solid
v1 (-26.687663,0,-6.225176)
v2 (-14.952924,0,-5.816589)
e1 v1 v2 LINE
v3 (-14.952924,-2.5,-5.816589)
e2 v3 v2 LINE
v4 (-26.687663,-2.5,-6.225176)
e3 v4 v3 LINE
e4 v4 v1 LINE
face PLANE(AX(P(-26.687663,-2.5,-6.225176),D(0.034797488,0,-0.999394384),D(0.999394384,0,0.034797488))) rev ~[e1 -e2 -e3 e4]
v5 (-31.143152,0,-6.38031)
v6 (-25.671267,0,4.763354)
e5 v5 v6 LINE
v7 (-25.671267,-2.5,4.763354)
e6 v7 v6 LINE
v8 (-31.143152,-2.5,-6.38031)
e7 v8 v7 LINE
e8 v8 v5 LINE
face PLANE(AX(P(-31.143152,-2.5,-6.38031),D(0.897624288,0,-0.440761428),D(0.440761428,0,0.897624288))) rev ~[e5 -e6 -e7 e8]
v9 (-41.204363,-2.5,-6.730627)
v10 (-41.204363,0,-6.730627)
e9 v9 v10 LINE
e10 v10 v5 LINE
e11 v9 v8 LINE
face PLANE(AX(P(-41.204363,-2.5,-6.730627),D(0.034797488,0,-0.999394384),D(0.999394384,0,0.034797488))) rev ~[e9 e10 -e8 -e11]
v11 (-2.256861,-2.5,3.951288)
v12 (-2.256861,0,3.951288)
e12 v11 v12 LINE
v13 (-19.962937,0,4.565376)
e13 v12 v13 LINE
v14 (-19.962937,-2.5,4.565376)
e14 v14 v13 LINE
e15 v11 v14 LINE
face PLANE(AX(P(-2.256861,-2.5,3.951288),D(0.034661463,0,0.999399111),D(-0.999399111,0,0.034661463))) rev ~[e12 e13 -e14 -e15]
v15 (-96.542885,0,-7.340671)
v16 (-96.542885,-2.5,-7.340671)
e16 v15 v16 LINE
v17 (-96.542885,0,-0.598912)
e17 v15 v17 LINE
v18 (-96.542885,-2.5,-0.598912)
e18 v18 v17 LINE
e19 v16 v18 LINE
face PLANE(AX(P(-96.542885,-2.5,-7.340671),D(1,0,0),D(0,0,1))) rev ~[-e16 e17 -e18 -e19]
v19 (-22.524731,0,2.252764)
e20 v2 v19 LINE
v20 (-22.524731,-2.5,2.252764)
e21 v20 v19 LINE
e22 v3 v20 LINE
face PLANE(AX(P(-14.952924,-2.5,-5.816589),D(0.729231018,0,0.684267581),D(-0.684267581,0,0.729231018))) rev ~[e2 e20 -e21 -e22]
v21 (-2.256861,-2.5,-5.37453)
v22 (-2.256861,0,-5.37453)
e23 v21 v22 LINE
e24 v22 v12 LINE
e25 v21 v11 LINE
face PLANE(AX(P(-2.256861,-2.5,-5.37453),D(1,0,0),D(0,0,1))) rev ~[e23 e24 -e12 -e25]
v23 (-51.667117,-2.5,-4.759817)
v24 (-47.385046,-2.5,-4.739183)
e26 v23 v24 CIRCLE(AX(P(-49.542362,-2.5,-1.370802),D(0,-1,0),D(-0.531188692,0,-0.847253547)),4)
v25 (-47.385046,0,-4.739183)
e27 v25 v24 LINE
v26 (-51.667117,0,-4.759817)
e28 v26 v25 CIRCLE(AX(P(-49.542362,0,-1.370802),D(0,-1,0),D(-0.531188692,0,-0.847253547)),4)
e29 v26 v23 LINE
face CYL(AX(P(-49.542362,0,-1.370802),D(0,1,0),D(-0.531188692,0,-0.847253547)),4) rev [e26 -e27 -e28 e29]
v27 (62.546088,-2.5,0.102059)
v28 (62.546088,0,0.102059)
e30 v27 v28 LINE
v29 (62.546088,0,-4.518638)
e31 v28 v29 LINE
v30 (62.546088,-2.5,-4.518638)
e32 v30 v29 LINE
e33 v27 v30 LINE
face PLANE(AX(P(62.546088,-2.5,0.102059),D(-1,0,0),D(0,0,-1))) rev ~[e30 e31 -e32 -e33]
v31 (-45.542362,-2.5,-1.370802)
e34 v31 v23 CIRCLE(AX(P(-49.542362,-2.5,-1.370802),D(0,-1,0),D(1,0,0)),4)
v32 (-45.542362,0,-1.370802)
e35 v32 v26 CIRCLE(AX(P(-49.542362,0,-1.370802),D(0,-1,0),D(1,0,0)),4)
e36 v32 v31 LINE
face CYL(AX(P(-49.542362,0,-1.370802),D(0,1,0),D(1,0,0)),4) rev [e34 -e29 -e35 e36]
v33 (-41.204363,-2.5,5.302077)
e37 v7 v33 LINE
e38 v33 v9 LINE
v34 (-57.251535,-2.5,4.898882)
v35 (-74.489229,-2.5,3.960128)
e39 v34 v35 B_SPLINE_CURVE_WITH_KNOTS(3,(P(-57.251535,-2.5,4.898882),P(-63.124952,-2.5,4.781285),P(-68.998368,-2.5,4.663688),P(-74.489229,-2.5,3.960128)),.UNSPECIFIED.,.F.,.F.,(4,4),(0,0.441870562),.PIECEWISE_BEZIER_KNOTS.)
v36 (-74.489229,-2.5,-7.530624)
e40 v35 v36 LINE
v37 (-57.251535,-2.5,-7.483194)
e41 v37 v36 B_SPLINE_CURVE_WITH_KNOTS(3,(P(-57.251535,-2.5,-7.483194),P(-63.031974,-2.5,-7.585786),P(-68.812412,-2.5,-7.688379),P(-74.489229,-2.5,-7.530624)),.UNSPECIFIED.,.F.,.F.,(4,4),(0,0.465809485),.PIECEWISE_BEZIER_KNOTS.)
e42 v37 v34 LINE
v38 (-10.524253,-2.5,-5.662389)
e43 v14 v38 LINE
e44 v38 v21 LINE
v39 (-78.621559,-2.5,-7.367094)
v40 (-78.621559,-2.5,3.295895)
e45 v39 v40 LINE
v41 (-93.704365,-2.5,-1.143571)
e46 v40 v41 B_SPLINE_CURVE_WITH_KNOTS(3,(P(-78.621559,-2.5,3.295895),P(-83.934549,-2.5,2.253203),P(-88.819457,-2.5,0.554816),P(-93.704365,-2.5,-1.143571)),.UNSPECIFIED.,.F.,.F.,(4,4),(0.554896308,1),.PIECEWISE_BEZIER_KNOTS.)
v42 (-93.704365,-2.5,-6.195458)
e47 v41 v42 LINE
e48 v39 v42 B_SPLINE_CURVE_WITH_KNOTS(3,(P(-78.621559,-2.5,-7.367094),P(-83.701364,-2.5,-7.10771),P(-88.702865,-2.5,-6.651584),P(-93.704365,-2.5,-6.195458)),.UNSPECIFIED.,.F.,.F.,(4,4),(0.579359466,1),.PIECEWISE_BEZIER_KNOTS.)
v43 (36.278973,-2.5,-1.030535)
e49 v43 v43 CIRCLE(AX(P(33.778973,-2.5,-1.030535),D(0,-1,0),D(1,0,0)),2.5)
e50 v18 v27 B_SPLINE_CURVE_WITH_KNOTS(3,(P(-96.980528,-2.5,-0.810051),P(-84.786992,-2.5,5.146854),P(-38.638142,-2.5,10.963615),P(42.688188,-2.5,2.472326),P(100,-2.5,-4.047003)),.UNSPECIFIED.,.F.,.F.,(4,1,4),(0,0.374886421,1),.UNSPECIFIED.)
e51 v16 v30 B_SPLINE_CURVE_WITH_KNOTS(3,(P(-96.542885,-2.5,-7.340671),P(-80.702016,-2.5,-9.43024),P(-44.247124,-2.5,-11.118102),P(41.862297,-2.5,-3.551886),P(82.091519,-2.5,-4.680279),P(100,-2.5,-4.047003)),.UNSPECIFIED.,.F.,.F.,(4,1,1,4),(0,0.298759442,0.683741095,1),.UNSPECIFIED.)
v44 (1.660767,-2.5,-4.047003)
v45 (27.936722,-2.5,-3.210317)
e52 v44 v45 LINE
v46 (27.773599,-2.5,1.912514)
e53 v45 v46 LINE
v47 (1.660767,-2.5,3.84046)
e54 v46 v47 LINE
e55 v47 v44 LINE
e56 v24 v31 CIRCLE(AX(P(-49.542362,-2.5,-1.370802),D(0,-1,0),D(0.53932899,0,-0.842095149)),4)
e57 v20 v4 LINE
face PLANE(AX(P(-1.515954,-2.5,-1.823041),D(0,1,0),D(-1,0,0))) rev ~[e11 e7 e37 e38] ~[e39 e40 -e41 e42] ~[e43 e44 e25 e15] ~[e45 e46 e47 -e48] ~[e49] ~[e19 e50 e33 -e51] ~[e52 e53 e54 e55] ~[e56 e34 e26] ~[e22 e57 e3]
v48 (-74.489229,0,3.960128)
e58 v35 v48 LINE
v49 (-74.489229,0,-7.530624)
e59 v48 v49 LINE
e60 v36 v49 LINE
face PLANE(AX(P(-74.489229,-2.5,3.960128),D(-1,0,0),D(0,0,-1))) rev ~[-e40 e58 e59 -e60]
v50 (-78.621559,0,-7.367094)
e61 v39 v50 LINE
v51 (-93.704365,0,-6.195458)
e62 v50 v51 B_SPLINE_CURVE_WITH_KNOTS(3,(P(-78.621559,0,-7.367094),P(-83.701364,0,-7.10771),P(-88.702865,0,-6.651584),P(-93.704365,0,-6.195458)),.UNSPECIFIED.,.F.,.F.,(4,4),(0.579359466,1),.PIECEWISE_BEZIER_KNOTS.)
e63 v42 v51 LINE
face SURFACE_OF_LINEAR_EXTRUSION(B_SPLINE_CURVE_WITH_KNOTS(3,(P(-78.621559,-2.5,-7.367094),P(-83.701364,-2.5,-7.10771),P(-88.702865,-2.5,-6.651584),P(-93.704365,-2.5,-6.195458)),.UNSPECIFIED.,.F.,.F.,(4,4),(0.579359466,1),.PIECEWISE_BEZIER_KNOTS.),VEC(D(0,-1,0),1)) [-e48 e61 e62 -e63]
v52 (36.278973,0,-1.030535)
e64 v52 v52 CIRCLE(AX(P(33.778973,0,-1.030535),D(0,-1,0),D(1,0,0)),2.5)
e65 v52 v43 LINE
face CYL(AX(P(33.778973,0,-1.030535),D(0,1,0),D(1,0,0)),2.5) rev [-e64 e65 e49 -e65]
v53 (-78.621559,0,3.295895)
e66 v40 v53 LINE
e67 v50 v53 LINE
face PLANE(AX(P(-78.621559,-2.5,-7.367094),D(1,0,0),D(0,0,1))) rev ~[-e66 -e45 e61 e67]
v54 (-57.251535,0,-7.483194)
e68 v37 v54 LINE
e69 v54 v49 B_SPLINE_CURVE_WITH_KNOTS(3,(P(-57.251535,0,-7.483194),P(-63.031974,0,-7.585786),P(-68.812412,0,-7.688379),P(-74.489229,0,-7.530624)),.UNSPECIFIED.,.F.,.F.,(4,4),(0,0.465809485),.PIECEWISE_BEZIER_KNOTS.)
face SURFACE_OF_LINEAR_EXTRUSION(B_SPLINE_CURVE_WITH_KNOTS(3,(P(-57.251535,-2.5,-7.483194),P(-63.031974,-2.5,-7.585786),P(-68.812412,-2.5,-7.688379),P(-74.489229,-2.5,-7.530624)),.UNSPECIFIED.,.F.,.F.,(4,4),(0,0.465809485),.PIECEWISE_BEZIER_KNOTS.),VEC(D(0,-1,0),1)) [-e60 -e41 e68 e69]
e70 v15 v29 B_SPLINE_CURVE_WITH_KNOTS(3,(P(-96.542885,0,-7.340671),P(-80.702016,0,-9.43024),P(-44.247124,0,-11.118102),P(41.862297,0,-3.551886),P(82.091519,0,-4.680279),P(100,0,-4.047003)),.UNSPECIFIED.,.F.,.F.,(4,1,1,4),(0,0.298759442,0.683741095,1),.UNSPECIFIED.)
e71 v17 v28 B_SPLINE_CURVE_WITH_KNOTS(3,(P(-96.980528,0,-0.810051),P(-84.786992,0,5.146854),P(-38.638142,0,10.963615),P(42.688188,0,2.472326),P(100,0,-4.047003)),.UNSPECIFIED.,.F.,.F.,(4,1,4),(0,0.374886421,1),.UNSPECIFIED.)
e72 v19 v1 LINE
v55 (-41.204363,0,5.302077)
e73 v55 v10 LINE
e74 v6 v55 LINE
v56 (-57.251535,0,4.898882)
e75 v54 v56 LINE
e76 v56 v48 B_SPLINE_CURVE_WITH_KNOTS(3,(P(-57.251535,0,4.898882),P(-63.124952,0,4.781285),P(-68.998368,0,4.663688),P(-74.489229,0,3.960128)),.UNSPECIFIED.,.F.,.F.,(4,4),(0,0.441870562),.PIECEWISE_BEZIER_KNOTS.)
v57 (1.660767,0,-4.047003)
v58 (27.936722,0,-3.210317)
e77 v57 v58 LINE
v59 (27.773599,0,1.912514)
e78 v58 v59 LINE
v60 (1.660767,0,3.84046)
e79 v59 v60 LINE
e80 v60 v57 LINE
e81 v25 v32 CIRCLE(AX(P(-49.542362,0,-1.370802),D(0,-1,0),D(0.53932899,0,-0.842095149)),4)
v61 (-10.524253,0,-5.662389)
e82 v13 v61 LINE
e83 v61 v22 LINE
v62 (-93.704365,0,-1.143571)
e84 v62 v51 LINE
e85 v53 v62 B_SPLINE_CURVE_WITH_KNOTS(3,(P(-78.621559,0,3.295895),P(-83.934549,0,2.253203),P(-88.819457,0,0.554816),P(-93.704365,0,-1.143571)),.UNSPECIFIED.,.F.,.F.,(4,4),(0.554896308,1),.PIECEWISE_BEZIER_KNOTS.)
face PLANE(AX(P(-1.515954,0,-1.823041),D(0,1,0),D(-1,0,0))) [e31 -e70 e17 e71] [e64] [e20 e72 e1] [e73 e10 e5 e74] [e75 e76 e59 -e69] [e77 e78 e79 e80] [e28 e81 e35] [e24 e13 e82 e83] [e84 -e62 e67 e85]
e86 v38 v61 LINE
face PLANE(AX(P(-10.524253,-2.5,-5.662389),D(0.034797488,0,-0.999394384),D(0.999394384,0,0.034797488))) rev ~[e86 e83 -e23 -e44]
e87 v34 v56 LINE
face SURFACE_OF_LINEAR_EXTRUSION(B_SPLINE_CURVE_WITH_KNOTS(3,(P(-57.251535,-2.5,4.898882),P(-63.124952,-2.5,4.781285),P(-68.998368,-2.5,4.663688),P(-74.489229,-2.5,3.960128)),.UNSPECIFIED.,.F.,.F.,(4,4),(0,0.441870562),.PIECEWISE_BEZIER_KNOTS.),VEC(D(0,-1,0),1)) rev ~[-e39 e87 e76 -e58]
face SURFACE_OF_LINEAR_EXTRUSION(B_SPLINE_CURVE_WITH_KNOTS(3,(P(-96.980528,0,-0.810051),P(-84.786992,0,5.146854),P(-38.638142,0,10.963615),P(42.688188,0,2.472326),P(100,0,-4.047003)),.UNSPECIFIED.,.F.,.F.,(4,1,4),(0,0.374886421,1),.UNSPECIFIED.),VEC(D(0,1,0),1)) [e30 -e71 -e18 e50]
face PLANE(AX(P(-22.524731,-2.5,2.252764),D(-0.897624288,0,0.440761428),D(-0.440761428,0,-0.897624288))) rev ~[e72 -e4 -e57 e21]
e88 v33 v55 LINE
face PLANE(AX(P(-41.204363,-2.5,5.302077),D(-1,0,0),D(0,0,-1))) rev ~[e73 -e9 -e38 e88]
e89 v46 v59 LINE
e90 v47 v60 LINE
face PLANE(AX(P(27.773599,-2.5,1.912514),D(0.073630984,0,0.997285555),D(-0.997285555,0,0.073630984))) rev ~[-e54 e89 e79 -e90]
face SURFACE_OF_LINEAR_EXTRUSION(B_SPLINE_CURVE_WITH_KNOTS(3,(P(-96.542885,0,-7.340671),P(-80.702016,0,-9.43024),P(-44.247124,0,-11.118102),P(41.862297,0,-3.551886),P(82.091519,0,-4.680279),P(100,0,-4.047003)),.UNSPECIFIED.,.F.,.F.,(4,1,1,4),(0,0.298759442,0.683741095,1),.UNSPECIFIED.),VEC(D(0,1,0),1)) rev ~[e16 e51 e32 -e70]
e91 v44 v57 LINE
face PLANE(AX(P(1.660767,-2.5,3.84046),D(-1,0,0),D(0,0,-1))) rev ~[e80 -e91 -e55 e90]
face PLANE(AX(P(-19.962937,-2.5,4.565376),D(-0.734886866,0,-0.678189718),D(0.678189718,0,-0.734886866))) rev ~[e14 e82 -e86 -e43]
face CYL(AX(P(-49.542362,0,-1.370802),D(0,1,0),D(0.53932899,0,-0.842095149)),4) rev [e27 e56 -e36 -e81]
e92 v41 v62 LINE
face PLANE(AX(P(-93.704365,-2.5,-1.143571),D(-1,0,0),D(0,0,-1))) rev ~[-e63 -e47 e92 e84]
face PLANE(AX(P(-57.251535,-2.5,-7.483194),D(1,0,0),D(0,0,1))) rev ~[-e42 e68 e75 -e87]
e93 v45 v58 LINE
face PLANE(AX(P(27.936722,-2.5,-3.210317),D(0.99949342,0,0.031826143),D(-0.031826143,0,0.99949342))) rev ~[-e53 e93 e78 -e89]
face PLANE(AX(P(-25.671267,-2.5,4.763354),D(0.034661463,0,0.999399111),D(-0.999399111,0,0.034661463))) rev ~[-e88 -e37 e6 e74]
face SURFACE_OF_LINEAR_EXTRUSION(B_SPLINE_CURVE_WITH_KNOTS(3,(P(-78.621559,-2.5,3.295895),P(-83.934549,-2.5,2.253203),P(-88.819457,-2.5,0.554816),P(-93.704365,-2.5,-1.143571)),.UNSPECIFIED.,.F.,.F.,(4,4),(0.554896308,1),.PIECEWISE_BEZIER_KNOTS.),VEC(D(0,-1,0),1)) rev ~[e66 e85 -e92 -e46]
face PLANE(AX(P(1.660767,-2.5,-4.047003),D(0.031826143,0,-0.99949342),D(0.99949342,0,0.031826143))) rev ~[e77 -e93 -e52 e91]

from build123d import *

# Parameters (mm, degrees)
F2_DEPTH = 2.5
F1_R     = 2.5
F3_DEPTH = 2.5
F5_DEPTH = 2.5
F6_DEPTH = 2.5
F7_DEPTH = 2.5
F8_DEPTH = 2.5
F9_DEPTH = 2.5


# Not quite as in the source:
# - a feature names something its author has since deleted; it is built from what else it names


with BuildPart() as f2:
    # F0 (on Front) → F2 (new body)
    with BuildSketch(Plane.XZ):
        with BuildLine():
            add(Edge.make_bspline(
                [(-96.9805282175, -0.8100506688), (-84.7869920978, 5.1468541776), (-38.6381415733, 10.9636146396), (42.6881882799, 2.4723259958), (100, -4.047003109)],
                knots=[0, 0, 0, 0, 0.374886421, 1, 1, 1, 1], degree=3))
            add(Edge.make_bspline(
                [(-97.5447368223, -7.1186651935), (-99.939251346, -6.5508492693), (-102.885147974, -5.168950634), (-100.0067471137, -2.3789404522), (-96.9805282175, -0.8100506688)],
                knots=[0.0564585679, 0.0564585679, 0.0564585679, 0.0564585679, 0.4847104148, 1, 1, 1, 1], degree=3))
            add(Edge.make_bspline(
                [(-96.5428845142, -7.3406707446), (-96.8949965543, -7.2673488468), (-97.22905608, -7.1935231869), (-97.5447368223, -7.1186651935)],
                knots=[0, 0, 0, 0, 0.0564585679, 0.0564585679, 0.0564585679, 0.0564585679], degree=3))
            add(Edge.make_bspline(
                [(-96.5428845142, -7.3406707446), (-80.7020161693, -9.4302402111), (-44.2471235075, -11.1181020976), (41.8622965332, -3.5518856086), (82.0915186506, -4.6802794425), (100, -4.047003109)],
                knots=[0, 0, 0, 0, 0.2987594418, 0.6837410955, 1, 1, 1, 1], degree=3))
        make_face()
        with BuildLine():
            add(Edge.make_bspline(
                [(-99.8196757147, -4.047003109), (-99.3821638101, -3.2227137691), (-97.9006497107, -2.3042858417), (-96.3385477662, -1.6362179573)],
                knots=[0.5425000514, 0.5425000514, 0.5425000514, 0.5425000514, 1, 1, 1, 1], degree=3))
            add(Edge.make_bspline(
                [(-96.3385477662, -1.6362179573), (-85.7442874691, 3.2900694446), (-38.7960585931, 10.0747672146), (36.943279708, 1.696590452), (86.094097513, -3.3751911245)],
                knots=[0, 0, 0, 0, 0.384923117, 1, 1, 1, 1], degree=3))
            add(Edge.make_bspline(
                [(-97.3825784566, -6.0471531808), (-82.3468325761, -8.841713568), (-44.2551066449, -8.6286827794), (40.9195716837, -3.3120714751), (72.7341022162, -3.1550192186), (86.094097513, -3.3751911245)],
                knots=[0, 0, 0, 0, 0.3131273629, 0.7122131732, 1, 1, 1, 1], degree=3))
            add(Edge.make_bspline(
                [(-97.3825784566, -6.0471531808), (-98.6588937786, -5.8946130057), (-100.1661659123, -5.1778479876), (-99.9138553768, -4.2244412327), (-99.8196757147, -4.047003109)],
                knots=[0, 0, 0, 0, 0.4440177242, 0.5425000514, 0.5425000514, 0.5425000514, 0.5425000514], degree=3))
        make_face(mode=Mode.SUBTRACT)
        with BuildLine():
            add(Edge.make_bspline(
                [(-96.3385477662, -1.6362179573), (-85.7442874691, 3.2900694446), (-38.7960585931, 10.0747672146), (36.943279708, 1.696590452), (86.094097513, -3.3751911245)],
                knots=[0, 0, 0, 0, 0.384923117, 1, 1, 1, 1], degree=3))
            add(Edge.make_bspline(
                [(-99.8196757147, -4.047003109), (-99.3821638101, -3.2227137691), (-97.9006497107, -2.3042858417), (-96.3385477662, -1.6362179573)],
                knots=[0.5425000514, 0.5425000514, 0.5425000514, 0.5425000514, 1, 1, 1, 1], degree=3))
            add(Edge.make_bspline(
                [(-97.3825784566, -6.0471531808), (-98.6588937786, -5.8946130057), (-100.1661659123, -5.1778479876), (-99.9138553768, -4.2244412327), (-99.8196757147, -4.047003109)],
                knots=[0, 0, 0, 0, 0.4440177242, 0.5425000514, 0.5425000514, 0.5425000514, 0.5425000514], degree=3))
            add(Edge.make_bspline(
                [(-97.3825784566, -6.0471531808), (-82.3468325761, -8.841713568), (-44.2551066449, -8.6286827794), (40.9195716837, -3.3120714751), (72.7341022162, -3.1550192186), (86.094097513, -3.3751911245)],
                knots=[0, 0, 0, 0, 0.3131273629, 0.7122131732, 1, 1, 1, 1], degree=3))
        make_face()
        with BuildLine():
            add(Edge.make_bspline(
                [(-96.5428845142, -7.3406707446), (-96.8949965543, -7.2673488468), (-97.22905608, -7.1935231869), (-97.5447368223, -7.1186651935)],
                knots=[0, 0, 0, 0, 0.0564585679, 0.0564585679, 0.0564585679, 0.0564585679], degree=3))
            ThreePointArc((-97.5447368223, -7.1186651935), (-97.052492706, -7.2688477084), (-96.5428845142, -7.3406707446))
        make_face()
    extrude(amount=F2_DEPTH)


with BuildPart() as f2b:
    # F1 (on Front) → F2, piece 2 (new body)
    with BuildSketch(Plane.XZ):
        with Locations((33.7789729238, -1.0305350879)):
            Circle(F1_R)
    extrude(amount=F2_DEPTH)


with BuildPart() as f2c:
    # F1 (on Front) → F2, piece 3 (new body)
    with BuildSketch(Plane.XZ):
        with BuildLine():
            ThreePointArc((-45.542362095, -1.3708024857), (-51.4789804014, 2.1291274472), (-51.6671168627, -4.7598166753))
            Line((-51.6671168627, -4.7598166753), (-47.385046135, -4.7391830831))
            ThreePointArc((-47.385046135, -4.7391830831), (-46.0331411102, -3.2905337378), (-45.542362095, -1.3708024857))
        make_face()
        with BuildLine():
            Line((-47.385046135, -4.7391830831), (-51.6671168627, -4.7598166753))
            ThreePointArc((-51.6671168627, -4.7598166753), (-49.523087913, -5.3707560487), (-47.385046135, -4.7391830831))
        make_face()
    extrude(amount=F2_DEPTH)


with BuildPart() as f3_tool:
    # F1 (on Front) → F3 (new body)
    with BuildSketch(Plane.XZ):
        with BuildLine():
            ThreePointArc((-45.542362095, -1.3708024857), (-51.4789804014, 2.1291274472), (-51.6671168627, -4.7598166753))
            Line((-51.6671168627, -4.7598166753), (-47.385046135, -4.7391830831))
            ThreePointArc((-47.385046135, -4.7391830831), (-46.0331411102, -3.2905337378), (-45.542362095, -1.3708024857))
        make_face()
        with BuildLine():
            Line((-47.385046135, -4.7391830831), (-51.6671168627, -4.7598166753))
            ThreePointArc((-51.6671168627, -4.7598166753), (-49.523087913, -5.3707560487), (-47.385046135, -4.7391830831))
        make_face()
        with Locations((33.7789729238, -1.0305350879)):
            Circle(F1_R)
    extrude(amount=F3_DEPTH)


with BuildPart() as f2_1:
    add(f2.part)

    # F3: cut by f3_tool
    add(f3_tool.part, mode=Mode.SUBTRACT)

    # F4 (on face) → F5 (cut)
    with BuildSketch(Plane.XZ.offset(2.5)):
        with BuildLine():
            Line((-96.5428845142, -7.3406707446), (-96.5428845142, -0.5989118026))
            add(Edge.make_bspline(
                [(-96.9805282175, -0.8100506688), (-96.8353706427, -0.7391368787), (-96.6894893165, -0.6687582494), (-96.5428845142, -0.5989118026)],
                knots=[0, 0, 0, 0, 0.0044628238, 0.0044628238, 0.0044628238, 0.0044628238], degree=3))
            add(Edge.make_bspline(
                [(-96.9805282175, -0.8100506688), (-100.0067471137, -2.3789404522), (-102.885147974, -5.168950634), (-99.939251346, -6.5508492693), (-97.5447368223, -7.1186651935)],
                knots=[0.0564585679, 0.0564585679, 0.0564585679, 0.0564585679, 0.5717481532, 1, 1, 1, 1], degree=3))
            ThreePointArc((-97.5447368223, -7.1186651935), (-97.052492706, -7.2688477084), (-96.5428845142, -7.3406707446))
        make_face()
    extrude(amount=-F5_DEPTH, mode=Mode.SUBTRACT)

    # F4 (on face) → F6 (cut)
    with BuildSketch(Plane.XZ.offset(2.5)):
        with BuildLine():
            Line((-78.6215588156, -7.3670944992), (-78.6215588156, 3.2958948603))
            add(Edge.make_bspline(
                [(-78.6215588156, 3.2958948603), (-83.9345486349, 2.2532028855), (-88.8194569144, 0.5548157735), (-93.7043651938, -1.1435713386)],
                knots=[0.554896308, 0.554896308, 0.554896308, 0.554896308, 1, 1, 1, 1], degree=3))
            Line((-93.7043651938, -1.1435713386), (-93.7043651938, -6.1954581179))
            add(Edge.make_bspline(
                [(-78.6215588156, -7.3670944992), (-83.7013643272, -7.1077100258), (-88.7028647605, -6.6515840718), (-93.7043651938, -6.1954581179)],
                knots=[0.5793594661, 0.5793594661, 0.5793594661, 0.5793594661, 1, 1, 1, 1], degree=3))
        make_face()
        with BuildLine():
            Line((-57.251535356, -7.4831936508), (-57.251535356, 4.8988820054))
            add(Edge.make_bspline(
                [(-57.251535356, 4.8988820054), (-63.1249518816, 4.7812850577), (-68.9983684072, 4.66368811), (-74.4892291338, 3.9601280834)],
                knots=[0, 0, 0, 0, 0.4418705618, 0.4418705618, 0.4418705618, 0.4418705618], degree=3))
            Line((-74.4892291338, 3.9601280834), (-74.4892291338, -7.5306241193))
            add(Edge.make_bspline(
                [(-57.251535356, -7.4831936508), (-63.0319736557, -7.5857864832), (-68.8124119553, -7.6883793156), (-74.4892291338, -7.5306241193)],
                knots=[0, 0, 0, 0, 0.4658094847, 0.4658094847, 0.4658094847, 0.4658094847], degree=3))
        make_face()
        Polygon((27.7735989974, 1.9125135442), (1.6607665457, 3.840460399), (1.6607665457, -4.047003109), (27.9367215699, -3.2103169474), align=None)
    extrude(amount=-F6_DEPTH, mode=Mode.SUBTRACT)

    # F4 (on face) → F7 (cut)
    with BuildSketch(Plane.XZ.offset(2.5)):
        with BuildLine():
            add(Edge.make_bspline(
                [(62.5460875734, 0.1020588345), (74.6514883615, -1.1873862537), (87.1633646635, -2.586811085), (100, -4.047003109)],
                knots=[0.8599877614, 0.8599877614, 0.8599877614, 0.8599877614, 1, 1, 1, 1], degree=3))
            Line((62.5460875734, 0.1020588345), (62.5460875734, -4.518638291))
            add(Edge.make_bspline(
                [(62.5460875734, -4.518638291), (75.9097127299, -4.3829595873), (88.0075171585, -4.4710790211), (100, -4.047003109)],
                knots=[0.7882160183, 0.7882160183, 0.7882160183, 0.7882160183, 1, 1, 1, 1], degree=3))
        make_face()
    extrude(amount=-F7_DEPTH, mode=Mode.SUBTRACT)

    # F4 (on face) → F8 (cut)
    with BuildSketch(Plane.XZ.offset(2.5)):
        with BuildLine():
            Line((-78.6215588156, -7.3670944992), (-78.6215588156, 3.2958948603))
            add(Edge.make_bspline(
                [(-78.6215588156, 3.2958948603), (-83.9345486349, 2.2532028855), (-88.8194569144, 0.5548157735), (-93.7043651938, -1.1435713386)],
                knots=[0.554896308, 0.554896308, 0.554896308, 0.554896308, 1, 1, 1, 1], degree=3))
            Line((-93.7043651938, -1.1435713386), (-93.7043651938, -6.1954581179))
            add(Edge.make_bspline(
                [(-78.6215588156, -7.3670944992), (-83.7013643272, -7.1077100258), (-88.7028647605, -6.6515840718), (-93.7043651938, -6.1954581179)],
                knots=[0.5793594661, 0.5793594661, 0.5793594661, 0.5793594661, 1, 1, 1, 1], degree=3))
        make_face()
        with BuildLine():
            Line((-57.251535356, -7.4831936508), (-57.251535356, 4.8988820054))
            add(Edge.make_bspline(
                [(-57.251535356, 4.8988820054), (-63.1249518816, 4.7812850577), (-68.9983684072, 4.66368811), (-74.4892291338, 3.9601280834)],
                knots=[0, 0, 0, 0, 0.4418705618, 0.4418705618, 0.4418705618, 0.4418705618], degree=3))
            Line((-74.4892291338, 3.9601280834), (-74.4892291338, -7.5306241193))
            add(Edge.make_bspline(
                [(-57.251535356, -7.4831936508), (-63.0319736557, -7.5857864832), (-68.8124119553, -7.6883793156), (-74.4892291338, -7.5306241193)],
                knots=[0, 0, 0, 0, 0.4658094847, 0.4658094847, 0.4658094847, 0.4658094847], degree=3))
        make_face()
        Polygon((-41.2043631077, 5.3020771593), (-41.2043631077, -6.7306268347), (-31.1431517353, -6.3803097993), (-25.6712666077, 4.7633535934), align=None)
        Polygon((27.7735989974, 1.9125135442), (1.6607665457, 3.840460399), (1.6607665457, -4.047003109), (27.9367215699, -3.2103169474), align=None)
    extrude(amount=-F8_DEPTH, mode=Mode.SUBTRACT)

    # F4 (on face) → F9 (cut)
    with BuildSketch(Plane.XZ.offset(2.5)):
        Polygon((-22.5247312337, 2.2527640685), (-26.6876633679, -6.2251760467), (-14.952923861, -5.8165891476), align=None)
        Polygon((-2.2568607237, 3.9512880641), (-19.9629371484, 4.5653755791), (-10.5242531862, -5.6623891488), (-2.2568607237, -5.3745303303), align=None)
        Polygon((27.7735989974, 1.9125135442), (1.6607665457, 3.840460399), (1.6607665457, -4.047003109), (27.9367215699, -3.2103169474), align=None)
        with BuildLine():
            Line((-57.251535356, -7.4831936508), (-57.251535356, 4.8988820054))
            add(Edge.make_bspline(
                [(-57.251535356, 4.8988820054), (-63.1249518816, 4.7812850577), (-68.9983684072, 4.66368811), (-74.4892291338, 3.9601280834)],
                knots=[0, 0, 0, 0, 0.4418705618, 0.4418705618, 0.4418705618, 0.4418705618], degree=3))
            Line((-74.4892291338, 3.9601280834), (-74.4892291338, -7.5306241193))
            add(Edge.make_bspline(
                [(-57.251535356, -7.4831936508), (-63.0319736557, -7.5857864832), (-68.8124119553, -7.6883793156), (-74.4892291338, -7.5306241193)],
                knots=[0, 0, 0, 0, 0.4658094847, 0.4658094847, 0.4658094847, 0.4658094847], degree=3))
        make_face()
        with BuildLine():
            Line((-78.6215588156, -7.3670944992), (-78.6215588156, 3.2958948603))
            add(Edge.make_bspline(
                [(-78.6215588156, 3.2958948603), (-83.9345486349, 2.2532028855), (-88.8194569144, 0.5548157735), (-93.7043651938, -1.1435713386)],
                knots=[0.554896308, 0.554896308, 0.554896308, 0.554896308, 1, 1, 1, 1], degree=3))
            Line((-93.7043651938, -1.1435713386), (-93.7043651938, -6.1954581179))
            add(Edge.make_bspline(
                [(-78.6215588156, -7.3670944992), (-83.7013643272, -7.1077100258), (-88.7028647605, -6.6515840718), (-93.7043651938, -6.1954581179)],
                knots=[0.5793594661, 0.5793594661, 0.5793594661, 0.5793594661, 1, 1, 1, 1], degree=3))
        make_face()
        Polygon((-41.2043631077, 5.3020771593), (-41.2043631077, -6.7306268347), (-31.1431517353, -6.3803097993), (-25.6712666077, 4.7633535934), align=None)
    extrude(amount=-F9_DEPTH, mode=Mode.SUBTRACT)


with BuildPart() as f2b_1:
    add(f2b.part)

    # F3: cut by f3_tool
    add(f3_tool.part, mode=Mode.SUBTRACT)


with BuildPart() as f2c_1:
    add(f2c.part)

    # F3: cut by f3_tool
    add(f3_tool.part, mode=Mode.SUBTRACT)


solid = f2_1.part
